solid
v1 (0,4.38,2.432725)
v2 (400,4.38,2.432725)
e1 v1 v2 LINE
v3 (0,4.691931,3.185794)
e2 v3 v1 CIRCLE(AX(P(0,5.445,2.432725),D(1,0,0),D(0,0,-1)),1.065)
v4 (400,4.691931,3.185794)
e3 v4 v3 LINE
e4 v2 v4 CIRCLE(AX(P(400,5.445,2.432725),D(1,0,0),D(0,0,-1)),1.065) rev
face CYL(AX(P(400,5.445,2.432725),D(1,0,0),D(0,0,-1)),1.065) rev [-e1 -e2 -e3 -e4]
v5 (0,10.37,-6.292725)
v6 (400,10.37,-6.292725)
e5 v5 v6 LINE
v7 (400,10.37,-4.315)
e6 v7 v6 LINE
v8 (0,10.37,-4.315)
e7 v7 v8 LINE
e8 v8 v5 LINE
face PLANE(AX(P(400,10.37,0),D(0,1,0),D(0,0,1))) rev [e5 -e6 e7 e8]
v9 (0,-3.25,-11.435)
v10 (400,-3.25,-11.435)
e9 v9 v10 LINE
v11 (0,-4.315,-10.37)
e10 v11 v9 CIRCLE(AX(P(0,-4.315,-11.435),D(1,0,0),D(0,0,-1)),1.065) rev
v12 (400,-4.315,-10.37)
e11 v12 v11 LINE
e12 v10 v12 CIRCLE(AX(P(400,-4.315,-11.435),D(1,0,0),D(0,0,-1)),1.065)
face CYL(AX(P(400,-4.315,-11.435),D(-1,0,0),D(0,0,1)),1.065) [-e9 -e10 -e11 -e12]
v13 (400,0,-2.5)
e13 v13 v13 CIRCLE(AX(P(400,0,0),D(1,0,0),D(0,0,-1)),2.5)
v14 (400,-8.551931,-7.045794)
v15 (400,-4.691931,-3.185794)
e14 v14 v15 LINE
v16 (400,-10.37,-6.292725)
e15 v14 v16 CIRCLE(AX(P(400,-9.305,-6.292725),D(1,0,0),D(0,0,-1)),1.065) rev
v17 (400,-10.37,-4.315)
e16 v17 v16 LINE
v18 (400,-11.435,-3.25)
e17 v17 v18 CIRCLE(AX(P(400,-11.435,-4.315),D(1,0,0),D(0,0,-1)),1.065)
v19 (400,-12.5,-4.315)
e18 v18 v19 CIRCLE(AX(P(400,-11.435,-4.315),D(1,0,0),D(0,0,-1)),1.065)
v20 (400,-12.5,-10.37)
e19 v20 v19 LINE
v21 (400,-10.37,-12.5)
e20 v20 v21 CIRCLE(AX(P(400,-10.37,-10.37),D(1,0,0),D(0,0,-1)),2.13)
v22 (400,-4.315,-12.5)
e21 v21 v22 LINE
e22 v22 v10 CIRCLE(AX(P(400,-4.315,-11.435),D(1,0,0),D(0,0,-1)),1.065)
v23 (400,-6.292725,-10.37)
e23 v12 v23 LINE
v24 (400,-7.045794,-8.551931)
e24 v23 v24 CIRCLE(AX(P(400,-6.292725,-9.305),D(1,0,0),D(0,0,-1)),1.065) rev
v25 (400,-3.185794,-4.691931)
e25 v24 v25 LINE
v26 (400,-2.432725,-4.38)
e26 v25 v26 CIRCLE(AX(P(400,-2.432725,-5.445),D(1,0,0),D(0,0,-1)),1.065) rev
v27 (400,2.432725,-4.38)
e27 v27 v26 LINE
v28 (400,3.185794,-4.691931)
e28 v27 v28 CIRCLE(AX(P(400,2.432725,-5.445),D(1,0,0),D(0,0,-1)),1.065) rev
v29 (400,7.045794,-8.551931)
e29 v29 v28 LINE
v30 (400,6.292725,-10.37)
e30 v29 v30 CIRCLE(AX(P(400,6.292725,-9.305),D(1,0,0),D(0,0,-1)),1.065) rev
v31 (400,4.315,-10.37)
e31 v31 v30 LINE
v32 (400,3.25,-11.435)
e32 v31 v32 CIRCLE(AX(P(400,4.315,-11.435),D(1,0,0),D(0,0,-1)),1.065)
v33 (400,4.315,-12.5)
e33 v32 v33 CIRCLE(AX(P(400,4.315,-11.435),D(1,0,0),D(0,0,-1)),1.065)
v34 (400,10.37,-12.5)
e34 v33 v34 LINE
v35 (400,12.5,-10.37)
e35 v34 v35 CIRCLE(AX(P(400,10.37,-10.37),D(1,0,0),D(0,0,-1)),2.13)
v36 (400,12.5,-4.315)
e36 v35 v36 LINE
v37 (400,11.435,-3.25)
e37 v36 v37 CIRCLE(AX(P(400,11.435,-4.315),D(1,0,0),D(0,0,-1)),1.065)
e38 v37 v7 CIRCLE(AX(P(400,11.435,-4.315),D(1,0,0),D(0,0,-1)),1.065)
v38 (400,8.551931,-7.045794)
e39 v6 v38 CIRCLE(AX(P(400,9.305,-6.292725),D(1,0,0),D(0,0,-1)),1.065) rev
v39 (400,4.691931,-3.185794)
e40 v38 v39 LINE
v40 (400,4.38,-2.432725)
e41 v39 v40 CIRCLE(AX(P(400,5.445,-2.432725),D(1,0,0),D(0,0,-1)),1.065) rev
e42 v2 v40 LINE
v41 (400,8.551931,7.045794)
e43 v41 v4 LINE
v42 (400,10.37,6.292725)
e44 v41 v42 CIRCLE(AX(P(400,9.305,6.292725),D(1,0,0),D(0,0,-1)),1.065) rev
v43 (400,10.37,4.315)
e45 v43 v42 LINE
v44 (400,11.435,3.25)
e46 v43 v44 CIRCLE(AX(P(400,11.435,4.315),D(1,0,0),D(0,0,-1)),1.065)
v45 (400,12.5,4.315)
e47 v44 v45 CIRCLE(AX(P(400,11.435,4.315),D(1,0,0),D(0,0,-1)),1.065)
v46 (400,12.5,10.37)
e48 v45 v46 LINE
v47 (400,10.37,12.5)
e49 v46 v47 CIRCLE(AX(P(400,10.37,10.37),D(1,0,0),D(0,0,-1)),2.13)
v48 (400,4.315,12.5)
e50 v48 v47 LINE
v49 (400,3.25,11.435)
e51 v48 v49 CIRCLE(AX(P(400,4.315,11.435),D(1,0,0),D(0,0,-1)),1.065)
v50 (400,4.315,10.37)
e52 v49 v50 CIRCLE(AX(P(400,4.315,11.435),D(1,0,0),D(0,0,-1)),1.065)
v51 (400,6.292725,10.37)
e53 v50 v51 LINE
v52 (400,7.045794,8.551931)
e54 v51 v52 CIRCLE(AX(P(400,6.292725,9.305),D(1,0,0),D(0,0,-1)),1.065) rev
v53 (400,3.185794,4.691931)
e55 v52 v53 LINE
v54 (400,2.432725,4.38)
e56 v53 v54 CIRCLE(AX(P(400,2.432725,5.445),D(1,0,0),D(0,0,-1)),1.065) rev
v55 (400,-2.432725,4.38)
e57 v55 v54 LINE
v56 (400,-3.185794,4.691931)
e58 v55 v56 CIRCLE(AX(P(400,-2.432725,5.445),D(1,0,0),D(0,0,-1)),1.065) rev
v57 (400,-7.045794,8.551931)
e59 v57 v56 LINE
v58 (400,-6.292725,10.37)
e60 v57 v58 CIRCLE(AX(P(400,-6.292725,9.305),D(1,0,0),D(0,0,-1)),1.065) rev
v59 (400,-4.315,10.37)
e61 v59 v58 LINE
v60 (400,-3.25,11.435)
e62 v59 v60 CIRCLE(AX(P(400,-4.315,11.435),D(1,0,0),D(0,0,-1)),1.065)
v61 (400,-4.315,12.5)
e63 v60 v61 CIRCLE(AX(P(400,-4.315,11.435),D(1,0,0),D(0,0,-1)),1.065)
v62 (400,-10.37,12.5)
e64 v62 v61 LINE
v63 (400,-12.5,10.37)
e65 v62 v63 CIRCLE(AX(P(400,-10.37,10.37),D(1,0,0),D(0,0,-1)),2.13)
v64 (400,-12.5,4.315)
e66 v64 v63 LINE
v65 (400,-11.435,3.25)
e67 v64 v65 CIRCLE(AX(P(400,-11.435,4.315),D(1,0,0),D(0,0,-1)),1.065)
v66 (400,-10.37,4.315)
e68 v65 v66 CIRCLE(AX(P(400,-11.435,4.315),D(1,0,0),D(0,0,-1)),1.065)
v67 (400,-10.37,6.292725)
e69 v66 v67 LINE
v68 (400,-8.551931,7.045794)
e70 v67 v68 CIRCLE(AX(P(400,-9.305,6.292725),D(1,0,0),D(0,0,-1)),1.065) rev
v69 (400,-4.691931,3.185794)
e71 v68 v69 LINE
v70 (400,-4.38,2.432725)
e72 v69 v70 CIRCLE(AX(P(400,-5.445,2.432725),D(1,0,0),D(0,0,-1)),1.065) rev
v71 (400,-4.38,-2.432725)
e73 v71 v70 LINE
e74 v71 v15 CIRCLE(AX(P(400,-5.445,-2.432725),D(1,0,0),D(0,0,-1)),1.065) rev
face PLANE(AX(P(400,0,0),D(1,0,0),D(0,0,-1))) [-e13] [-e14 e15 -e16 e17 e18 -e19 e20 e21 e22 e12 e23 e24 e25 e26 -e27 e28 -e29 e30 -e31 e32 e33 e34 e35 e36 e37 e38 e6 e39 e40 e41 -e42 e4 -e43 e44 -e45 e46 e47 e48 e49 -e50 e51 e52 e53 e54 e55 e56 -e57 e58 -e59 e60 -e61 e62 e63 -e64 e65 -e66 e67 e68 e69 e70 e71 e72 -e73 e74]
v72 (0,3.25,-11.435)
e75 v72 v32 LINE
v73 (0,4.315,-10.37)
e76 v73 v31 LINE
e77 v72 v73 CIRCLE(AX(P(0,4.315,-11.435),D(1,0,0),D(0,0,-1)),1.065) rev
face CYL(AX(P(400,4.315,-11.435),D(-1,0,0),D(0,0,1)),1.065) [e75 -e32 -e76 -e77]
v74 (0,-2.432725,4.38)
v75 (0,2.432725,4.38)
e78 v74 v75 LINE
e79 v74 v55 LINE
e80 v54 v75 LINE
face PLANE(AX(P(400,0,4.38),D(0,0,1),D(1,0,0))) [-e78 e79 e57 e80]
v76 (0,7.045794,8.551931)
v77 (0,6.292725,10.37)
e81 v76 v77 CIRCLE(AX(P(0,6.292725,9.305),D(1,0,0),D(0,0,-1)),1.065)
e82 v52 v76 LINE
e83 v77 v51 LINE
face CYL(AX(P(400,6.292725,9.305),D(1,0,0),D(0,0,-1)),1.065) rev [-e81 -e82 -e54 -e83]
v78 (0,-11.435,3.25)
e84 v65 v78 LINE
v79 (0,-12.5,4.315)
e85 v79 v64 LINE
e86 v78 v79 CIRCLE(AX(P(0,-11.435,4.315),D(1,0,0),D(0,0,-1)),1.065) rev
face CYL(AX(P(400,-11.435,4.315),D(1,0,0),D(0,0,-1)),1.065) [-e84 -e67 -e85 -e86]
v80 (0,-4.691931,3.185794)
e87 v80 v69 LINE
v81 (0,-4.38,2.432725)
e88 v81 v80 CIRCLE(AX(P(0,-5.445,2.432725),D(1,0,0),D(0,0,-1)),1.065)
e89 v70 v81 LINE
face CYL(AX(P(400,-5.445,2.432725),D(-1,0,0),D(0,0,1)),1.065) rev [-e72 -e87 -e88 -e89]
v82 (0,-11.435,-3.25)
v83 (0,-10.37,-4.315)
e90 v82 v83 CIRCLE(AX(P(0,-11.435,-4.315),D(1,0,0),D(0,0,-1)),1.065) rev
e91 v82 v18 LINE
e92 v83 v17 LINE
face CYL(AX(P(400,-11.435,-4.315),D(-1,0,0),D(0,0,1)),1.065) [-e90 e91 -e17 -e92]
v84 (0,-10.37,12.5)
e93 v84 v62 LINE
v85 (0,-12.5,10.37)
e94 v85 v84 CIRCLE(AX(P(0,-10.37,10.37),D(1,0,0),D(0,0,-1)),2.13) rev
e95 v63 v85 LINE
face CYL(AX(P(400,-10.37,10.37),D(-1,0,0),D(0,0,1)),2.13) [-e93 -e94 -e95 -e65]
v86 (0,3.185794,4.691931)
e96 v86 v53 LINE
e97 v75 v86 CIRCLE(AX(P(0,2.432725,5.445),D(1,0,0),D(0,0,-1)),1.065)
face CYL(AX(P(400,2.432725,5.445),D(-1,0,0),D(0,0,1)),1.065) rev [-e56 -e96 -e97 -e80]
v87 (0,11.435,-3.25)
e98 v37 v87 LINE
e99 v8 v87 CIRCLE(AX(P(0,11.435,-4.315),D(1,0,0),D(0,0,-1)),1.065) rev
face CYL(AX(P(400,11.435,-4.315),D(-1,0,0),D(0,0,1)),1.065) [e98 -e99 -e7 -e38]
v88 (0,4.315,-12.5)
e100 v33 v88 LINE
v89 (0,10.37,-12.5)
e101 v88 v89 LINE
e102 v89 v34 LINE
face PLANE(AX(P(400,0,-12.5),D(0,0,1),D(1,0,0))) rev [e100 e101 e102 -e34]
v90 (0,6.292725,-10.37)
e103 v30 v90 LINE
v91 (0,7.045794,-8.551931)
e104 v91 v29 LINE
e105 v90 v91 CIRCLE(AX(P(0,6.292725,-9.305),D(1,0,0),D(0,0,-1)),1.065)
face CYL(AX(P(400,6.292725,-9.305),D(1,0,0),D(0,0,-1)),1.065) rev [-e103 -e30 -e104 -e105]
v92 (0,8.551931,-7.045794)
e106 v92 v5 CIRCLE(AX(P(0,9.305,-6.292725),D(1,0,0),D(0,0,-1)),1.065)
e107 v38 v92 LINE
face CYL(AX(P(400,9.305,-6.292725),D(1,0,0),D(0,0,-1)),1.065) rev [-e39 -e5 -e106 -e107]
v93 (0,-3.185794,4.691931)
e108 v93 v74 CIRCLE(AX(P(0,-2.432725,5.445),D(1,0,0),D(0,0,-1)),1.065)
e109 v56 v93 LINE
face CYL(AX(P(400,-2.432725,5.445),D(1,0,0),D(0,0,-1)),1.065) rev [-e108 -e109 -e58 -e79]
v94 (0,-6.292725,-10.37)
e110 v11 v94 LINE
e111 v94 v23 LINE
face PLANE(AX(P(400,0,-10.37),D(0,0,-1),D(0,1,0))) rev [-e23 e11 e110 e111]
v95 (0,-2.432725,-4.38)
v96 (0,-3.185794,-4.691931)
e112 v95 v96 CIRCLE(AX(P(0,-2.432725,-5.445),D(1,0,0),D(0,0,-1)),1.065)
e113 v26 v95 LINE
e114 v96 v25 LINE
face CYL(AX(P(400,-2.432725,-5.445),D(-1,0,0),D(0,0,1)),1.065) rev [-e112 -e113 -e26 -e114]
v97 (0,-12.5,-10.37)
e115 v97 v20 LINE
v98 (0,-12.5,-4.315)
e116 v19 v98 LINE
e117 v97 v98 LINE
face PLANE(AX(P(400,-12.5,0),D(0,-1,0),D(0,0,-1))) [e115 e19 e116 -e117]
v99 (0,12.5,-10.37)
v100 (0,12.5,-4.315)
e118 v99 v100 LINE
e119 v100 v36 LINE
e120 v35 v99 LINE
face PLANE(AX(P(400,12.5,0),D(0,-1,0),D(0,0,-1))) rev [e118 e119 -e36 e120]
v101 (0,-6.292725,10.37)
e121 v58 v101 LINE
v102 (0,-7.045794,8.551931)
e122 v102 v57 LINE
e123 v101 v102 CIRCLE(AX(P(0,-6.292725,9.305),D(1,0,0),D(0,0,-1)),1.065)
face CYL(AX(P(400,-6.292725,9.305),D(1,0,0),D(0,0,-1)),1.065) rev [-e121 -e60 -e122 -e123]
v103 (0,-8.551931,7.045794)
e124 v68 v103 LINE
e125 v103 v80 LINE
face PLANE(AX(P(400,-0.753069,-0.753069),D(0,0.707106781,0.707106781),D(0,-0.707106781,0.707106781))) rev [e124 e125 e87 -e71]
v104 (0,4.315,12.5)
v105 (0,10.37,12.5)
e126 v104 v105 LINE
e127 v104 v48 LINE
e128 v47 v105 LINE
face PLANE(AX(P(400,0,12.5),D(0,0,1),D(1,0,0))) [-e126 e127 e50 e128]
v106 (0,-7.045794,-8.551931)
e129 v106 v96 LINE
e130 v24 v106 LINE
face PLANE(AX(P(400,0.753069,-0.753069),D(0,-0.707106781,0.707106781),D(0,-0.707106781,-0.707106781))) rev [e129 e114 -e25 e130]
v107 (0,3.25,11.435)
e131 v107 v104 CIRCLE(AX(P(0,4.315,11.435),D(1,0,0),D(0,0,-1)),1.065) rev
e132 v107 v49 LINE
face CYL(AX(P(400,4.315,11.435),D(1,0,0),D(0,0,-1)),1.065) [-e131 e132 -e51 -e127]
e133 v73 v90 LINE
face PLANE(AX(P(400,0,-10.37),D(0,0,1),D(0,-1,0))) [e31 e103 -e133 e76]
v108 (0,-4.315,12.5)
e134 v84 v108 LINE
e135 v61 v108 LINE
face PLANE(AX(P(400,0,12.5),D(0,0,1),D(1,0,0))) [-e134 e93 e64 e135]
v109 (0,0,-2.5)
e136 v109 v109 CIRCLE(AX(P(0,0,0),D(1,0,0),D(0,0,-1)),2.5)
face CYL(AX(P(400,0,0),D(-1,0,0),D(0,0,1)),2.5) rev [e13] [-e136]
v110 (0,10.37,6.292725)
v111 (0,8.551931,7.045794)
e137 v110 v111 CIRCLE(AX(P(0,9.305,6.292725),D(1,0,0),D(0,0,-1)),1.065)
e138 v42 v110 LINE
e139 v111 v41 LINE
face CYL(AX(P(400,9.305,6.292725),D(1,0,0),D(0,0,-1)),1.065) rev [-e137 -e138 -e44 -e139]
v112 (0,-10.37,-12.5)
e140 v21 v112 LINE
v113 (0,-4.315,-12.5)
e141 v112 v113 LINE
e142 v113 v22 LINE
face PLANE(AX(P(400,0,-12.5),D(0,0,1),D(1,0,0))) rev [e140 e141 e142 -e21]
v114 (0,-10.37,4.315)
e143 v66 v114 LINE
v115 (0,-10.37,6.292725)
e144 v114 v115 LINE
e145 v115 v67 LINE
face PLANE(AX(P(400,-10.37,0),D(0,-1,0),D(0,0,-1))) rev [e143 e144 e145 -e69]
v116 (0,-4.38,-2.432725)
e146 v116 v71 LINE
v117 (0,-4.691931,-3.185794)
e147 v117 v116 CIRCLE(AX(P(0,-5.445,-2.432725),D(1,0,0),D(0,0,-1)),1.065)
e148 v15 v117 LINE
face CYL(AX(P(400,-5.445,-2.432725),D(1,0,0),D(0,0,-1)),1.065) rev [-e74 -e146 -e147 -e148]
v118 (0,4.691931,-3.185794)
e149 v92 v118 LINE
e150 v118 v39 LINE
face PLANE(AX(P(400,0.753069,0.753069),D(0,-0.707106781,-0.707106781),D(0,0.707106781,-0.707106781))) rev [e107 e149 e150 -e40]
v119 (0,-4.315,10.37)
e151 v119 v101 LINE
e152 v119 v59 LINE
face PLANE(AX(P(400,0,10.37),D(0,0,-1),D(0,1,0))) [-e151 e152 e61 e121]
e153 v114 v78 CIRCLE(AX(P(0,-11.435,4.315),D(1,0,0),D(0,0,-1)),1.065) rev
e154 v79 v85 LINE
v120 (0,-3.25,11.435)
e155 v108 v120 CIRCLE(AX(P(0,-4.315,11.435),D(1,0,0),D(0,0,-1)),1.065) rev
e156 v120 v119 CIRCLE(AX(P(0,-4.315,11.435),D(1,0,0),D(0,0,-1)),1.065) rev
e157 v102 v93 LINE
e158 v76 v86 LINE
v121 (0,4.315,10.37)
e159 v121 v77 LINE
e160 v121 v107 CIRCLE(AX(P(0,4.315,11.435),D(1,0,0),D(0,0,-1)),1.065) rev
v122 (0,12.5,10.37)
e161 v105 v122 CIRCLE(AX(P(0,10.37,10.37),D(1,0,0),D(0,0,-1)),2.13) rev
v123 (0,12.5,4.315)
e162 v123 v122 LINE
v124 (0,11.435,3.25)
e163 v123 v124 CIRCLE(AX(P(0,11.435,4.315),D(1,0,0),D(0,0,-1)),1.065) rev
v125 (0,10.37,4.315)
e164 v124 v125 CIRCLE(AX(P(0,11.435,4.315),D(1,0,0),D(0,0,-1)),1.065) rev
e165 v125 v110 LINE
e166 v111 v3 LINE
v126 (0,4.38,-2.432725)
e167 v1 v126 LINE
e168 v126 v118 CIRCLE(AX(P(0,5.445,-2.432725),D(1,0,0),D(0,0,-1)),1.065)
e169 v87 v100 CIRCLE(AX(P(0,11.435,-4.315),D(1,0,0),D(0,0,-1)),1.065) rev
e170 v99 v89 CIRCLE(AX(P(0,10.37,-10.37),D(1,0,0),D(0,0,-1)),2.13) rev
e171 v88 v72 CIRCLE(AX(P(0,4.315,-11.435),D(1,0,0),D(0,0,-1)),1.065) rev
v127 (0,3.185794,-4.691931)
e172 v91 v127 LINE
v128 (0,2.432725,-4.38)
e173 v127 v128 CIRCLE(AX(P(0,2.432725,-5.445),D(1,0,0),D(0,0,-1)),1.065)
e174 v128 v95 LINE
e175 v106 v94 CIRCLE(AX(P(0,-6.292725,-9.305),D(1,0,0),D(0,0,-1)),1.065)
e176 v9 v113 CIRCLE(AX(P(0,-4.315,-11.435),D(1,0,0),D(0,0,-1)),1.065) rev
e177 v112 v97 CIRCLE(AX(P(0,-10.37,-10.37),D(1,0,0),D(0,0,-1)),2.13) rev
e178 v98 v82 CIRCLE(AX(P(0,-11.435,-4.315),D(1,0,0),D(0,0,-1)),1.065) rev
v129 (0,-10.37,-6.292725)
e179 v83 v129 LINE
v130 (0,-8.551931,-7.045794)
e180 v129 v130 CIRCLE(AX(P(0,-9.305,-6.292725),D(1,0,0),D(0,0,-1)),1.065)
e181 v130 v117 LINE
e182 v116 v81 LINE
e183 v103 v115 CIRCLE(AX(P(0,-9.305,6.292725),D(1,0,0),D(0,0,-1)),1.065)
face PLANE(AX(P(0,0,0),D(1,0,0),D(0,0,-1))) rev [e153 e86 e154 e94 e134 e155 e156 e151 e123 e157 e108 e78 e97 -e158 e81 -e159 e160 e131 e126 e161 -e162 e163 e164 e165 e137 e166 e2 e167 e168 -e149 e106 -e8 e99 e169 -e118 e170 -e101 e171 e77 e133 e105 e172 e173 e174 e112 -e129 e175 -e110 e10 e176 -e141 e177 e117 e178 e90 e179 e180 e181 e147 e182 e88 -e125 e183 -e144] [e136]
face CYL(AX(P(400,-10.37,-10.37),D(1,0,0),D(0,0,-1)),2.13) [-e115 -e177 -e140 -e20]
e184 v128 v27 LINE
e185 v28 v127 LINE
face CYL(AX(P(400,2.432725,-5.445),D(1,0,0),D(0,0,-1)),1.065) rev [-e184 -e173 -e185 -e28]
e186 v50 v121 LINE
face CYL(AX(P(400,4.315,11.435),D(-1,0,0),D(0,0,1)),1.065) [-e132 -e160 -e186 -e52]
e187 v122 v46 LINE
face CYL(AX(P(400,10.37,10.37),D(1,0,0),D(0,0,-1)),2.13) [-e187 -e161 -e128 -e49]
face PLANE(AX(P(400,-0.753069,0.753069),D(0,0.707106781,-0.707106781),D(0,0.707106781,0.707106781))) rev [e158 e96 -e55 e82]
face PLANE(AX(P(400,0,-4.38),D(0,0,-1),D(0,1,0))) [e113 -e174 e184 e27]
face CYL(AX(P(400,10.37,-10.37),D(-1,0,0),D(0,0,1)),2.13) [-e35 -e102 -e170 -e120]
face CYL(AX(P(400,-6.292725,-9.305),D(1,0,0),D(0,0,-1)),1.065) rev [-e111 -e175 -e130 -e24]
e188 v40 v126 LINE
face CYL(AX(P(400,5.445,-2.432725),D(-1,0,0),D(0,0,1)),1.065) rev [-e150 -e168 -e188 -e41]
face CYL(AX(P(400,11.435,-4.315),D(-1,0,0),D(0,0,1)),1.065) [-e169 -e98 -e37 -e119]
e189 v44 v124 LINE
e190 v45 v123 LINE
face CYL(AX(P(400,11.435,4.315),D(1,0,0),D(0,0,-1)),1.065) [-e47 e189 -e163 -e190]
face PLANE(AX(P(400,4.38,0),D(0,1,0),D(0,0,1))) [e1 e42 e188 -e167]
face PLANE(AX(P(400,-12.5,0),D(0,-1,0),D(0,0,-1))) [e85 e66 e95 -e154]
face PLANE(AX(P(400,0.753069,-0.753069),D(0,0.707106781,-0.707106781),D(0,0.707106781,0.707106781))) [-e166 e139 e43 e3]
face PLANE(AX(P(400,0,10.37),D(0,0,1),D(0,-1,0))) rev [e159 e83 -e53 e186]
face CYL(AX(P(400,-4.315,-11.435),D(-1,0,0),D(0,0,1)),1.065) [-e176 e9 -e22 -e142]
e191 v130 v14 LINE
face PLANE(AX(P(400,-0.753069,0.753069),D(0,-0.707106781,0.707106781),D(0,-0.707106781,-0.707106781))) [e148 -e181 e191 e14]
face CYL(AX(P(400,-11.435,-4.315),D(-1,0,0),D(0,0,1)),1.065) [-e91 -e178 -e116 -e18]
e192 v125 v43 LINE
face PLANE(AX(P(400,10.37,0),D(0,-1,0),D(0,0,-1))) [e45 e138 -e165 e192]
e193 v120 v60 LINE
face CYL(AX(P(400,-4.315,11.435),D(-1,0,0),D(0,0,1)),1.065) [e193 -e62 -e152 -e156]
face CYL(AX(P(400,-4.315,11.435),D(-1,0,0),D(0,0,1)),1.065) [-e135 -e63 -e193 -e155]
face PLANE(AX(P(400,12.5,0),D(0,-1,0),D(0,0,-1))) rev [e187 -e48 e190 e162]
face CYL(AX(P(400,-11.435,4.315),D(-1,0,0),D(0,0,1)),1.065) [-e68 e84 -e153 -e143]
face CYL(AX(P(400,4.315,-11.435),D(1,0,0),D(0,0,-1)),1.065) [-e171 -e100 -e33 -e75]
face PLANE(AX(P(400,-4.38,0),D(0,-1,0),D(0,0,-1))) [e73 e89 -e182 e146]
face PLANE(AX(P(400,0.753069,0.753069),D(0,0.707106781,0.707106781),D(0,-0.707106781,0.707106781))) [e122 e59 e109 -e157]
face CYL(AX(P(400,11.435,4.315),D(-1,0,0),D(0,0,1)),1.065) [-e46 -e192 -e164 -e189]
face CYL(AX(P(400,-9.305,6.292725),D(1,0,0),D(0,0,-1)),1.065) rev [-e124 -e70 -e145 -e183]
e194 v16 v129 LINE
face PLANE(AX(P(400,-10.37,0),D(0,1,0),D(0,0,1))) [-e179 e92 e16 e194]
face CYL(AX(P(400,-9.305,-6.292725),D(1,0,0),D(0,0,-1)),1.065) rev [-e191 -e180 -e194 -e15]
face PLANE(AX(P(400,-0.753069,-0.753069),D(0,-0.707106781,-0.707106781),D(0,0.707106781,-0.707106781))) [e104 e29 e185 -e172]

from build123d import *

# Parameters (mm, degrees)
SKETCH1_R           = 2.5
BOSS_EXTRUDE1_DEPTH = 400
FILLET1_R           = 1.065
FILLET2_R           = 2.13


with BuildPart() as part:
    # Sketch1 → Boss-Extrude1 (new body)
    with BuildSketch(Plane.YZ):
        Polygon((-12.5, -3.25), (-12.5, -12.5), (-3.25, -12.5), (-3.25, -10.37), (-8.863862556, -10.37), (-2.873862556, -4.38), (2.873862556, -4.38), (8.863862556, -10.37), (3.25, -10.37), (3.25, -12.5), (12.5, -12.5), (12.5, -3.25), (10.37, -3.25), (10.37, -8.863862556), (4.38, -2.873862556), (4.38, 2.873862556), (10.37, 8.863862556), (10.37, 3.25), (12.5, 3.25), (12.5, 12.5), (3.25, 12.5), (3.25, 10.37), (8.863862556, 10.37), (2.873862556, 4.38), (-2.873862556, 4.38), (-8.863862556, 10.37), (-3.25, 10.37), (-3.25, 12.5), (-12.5, 12.5), (-12.5, 3.25), (-10.37, 3.25), (-10.37, 8.863862556), (-4.38, 2.873862556), (-4.38, -2.873862556), (-10.37, -8.863862556), (-10.37, -3.25), align=None)
        with Locations(Location((0, 0, 0), (0, 0, 270))):
            Circle(SKETCH1_R, mode=Mode.SUBTRACT)
    extrude(amount=BOSS_EXTRUDE1_DEPTH)

    # Fillet1
    fillet1_edges = [part.edges().sort_by_distance(p)[0] for p in [
        (200, -10.37, -8.863862556),
        (200, 2.873862556, -4.38),
        (200, -2.873862556, -4.38),
        (200, -4.38, 2.873862556),
        (200, -4.38, -2.873862556),
        (200, -2.873862556, 4.38),
        (200, 2.873862556, 4.38),
        (200, 4.38, 2.873862556),
        (200, 4.38, -2.873862556),
        (200, -8.863862556, -10.37),
        (200, 8.863862556, -10.37),
        (200, 10.37, -8.863862556),
        (200, -10.37, 8.863862556),
        (200, -8.863862556, 10.37),
        (200, 10.37, 8.863862556),
        (200, 8.863862556, 10.37),
        (200, 12.5, 3.25),
        (200, -3.25, -12.5),
        (200, -10.37, 3.25),
        (200, 10.37, 3.25),
        (200, -10.37, -3.25),
        (200, -12.5, -3.25),
        (200, -12.5, 3.25),
        (200, 3.25, -10.37),
        (200, -3.25, -10.37),
        (200, 3.25, -12.5),
        (200, 10.37, -3.25),
        (200, 12.5, -3.25),
        (200, 3.25, 12.5),
        (200, 3.25, 10.37),
        (200, -3.25, 10.37),
        (200, -3.25, 12.5),
    ]]
    fillet(fillet1_edges, radius=FILLET1_R - 0.0001)  # a hair under: the kernel refuses the full size

    # Fillet2
    fillet2_edges = [part.edges().sort_by_distance(p)[0] for p in [
        (200, -12.5, 12.5),
        (200, 12.5, 12.5),
        (200, 12.5, -12.5),
        (200, -12.5, -12.5),
    ]]
    fillet(fillet2_edges, radius=FILLET2_R)


solid = part.part
